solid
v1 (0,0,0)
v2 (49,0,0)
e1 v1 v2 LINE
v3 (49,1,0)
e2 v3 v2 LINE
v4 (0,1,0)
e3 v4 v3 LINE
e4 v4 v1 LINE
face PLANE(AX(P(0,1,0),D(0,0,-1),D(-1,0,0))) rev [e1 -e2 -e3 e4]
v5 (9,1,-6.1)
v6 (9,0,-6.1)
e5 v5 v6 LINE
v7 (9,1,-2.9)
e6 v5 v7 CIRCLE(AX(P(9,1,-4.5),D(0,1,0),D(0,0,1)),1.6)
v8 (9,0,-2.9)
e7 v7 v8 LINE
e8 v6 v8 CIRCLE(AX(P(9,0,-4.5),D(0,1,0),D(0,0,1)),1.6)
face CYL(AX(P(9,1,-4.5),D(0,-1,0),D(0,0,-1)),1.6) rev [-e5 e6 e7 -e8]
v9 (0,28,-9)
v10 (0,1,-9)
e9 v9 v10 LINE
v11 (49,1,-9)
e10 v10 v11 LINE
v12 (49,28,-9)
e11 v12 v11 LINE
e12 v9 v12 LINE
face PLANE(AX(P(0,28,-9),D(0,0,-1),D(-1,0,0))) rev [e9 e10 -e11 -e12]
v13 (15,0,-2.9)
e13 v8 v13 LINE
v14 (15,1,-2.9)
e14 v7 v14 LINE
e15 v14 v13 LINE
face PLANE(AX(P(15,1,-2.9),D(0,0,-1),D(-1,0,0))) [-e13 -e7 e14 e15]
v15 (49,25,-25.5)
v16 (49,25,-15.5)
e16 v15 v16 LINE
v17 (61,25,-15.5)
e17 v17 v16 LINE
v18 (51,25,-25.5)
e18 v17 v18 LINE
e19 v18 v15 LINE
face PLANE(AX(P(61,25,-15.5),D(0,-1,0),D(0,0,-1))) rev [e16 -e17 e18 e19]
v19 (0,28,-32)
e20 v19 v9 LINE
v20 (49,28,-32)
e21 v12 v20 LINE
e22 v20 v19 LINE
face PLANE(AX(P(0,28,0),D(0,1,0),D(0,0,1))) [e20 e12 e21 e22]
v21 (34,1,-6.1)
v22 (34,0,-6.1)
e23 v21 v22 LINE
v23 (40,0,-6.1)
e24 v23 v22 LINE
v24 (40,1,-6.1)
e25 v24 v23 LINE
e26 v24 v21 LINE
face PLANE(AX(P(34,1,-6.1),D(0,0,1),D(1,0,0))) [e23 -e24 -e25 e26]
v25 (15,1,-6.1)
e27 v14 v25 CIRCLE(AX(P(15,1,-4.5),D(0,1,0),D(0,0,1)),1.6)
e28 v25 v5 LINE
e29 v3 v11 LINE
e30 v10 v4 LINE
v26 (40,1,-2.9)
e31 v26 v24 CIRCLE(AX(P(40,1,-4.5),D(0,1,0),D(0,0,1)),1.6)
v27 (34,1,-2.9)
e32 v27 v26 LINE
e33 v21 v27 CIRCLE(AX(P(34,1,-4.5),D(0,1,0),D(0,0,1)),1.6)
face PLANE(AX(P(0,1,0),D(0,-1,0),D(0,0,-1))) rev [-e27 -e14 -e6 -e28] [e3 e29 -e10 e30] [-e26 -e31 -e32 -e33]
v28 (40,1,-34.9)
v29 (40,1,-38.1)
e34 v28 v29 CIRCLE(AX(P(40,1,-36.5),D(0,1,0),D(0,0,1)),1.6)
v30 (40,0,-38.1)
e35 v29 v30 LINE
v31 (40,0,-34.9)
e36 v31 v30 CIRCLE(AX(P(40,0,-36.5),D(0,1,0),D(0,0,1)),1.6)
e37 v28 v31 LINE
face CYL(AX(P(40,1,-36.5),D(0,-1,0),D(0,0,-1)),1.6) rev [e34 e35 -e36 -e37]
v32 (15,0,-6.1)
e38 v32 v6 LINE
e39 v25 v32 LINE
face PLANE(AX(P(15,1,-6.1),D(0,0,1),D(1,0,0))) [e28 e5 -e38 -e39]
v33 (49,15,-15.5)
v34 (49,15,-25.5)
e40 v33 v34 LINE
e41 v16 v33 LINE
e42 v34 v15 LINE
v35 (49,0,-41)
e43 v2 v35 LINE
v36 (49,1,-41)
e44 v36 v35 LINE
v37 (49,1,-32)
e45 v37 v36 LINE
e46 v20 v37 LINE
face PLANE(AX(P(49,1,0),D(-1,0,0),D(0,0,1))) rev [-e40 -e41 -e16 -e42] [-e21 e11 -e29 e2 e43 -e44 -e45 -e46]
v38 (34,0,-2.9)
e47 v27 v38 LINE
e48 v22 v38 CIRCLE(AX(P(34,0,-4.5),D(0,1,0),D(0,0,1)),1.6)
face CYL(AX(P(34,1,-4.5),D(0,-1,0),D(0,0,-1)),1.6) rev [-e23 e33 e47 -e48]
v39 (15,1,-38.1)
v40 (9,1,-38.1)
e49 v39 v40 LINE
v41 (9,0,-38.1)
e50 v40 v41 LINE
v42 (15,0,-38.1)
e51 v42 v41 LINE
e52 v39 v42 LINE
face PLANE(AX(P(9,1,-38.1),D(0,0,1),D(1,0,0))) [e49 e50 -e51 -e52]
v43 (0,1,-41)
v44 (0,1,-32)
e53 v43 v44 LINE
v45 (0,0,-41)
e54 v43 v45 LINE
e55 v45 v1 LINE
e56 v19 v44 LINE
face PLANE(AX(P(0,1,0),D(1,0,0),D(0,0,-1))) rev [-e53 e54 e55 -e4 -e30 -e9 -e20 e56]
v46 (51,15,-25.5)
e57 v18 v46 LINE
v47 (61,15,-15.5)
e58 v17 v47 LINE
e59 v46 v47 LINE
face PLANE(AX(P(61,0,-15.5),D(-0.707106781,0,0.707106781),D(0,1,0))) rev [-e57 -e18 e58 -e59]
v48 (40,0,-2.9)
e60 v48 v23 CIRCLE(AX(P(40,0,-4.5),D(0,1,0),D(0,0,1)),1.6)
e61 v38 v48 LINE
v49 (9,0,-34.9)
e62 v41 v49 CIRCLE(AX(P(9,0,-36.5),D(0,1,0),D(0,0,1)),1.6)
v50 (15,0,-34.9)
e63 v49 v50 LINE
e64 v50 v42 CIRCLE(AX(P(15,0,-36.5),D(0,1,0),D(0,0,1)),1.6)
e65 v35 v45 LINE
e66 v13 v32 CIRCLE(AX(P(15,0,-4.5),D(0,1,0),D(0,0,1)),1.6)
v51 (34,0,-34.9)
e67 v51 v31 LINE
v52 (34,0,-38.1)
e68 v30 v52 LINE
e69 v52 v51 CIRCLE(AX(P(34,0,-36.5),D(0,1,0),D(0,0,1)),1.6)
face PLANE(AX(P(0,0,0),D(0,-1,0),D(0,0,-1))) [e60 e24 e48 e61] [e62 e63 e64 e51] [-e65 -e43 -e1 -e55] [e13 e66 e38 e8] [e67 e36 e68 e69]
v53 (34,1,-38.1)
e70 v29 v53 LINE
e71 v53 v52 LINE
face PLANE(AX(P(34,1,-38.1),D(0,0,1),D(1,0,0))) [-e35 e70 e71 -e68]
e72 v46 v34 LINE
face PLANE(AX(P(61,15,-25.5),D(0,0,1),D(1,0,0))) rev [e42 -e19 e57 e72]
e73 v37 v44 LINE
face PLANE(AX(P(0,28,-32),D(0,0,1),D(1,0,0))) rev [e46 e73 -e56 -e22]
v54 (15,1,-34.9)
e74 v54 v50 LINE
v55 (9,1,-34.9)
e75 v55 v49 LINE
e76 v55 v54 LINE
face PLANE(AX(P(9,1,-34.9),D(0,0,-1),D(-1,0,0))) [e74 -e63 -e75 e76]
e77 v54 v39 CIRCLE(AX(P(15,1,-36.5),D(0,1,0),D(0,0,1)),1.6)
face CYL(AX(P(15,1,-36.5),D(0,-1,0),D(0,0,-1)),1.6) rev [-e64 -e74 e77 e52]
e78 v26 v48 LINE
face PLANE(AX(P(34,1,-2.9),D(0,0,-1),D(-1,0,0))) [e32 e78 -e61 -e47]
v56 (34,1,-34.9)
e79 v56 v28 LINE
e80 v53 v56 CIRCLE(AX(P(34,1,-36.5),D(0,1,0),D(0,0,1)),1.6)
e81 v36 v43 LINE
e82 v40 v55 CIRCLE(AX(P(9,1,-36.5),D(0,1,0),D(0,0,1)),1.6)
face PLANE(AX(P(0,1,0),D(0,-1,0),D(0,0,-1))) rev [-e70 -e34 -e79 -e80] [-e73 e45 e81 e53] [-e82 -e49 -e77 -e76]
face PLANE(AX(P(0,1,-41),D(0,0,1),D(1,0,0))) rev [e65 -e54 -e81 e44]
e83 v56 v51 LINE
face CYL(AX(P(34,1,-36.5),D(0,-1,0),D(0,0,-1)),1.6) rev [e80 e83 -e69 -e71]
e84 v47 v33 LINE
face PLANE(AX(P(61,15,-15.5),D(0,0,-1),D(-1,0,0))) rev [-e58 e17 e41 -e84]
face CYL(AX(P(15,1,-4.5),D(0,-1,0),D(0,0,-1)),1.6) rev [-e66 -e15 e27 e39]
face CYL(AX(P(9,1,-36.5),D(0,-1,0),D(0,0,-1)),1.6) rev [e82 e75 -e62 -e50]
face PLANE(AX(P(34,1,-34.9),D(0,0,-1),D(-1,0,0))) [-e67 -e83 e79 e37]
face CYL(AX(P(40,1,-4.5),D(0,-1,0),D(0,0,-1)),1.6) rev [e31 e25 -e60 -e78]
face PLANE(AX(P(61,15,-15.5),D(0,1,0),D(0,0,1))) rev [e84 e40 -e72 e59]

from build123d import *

# Parameters (mm, degrees)
SKETCH1_W           = 49
SKETCH1_H           = 41
BOSS_EXTRUDE1_DEPTH = 1
SKETCH2_W           = 49
SKETCH2_H           = 23
BOSS_EXTRUDE2_DEPTH = 27
SKETCH3_W           = 10
SKETCH3_H           = 10
BOSS_EXTRUDE3_DEPTH = 12
CHAMFER1_SIZE       = 10


with BuildPart() as part:
    # Sketch1 → Boss-Extrude1 (new body)
    with BuildSketch(Plane(origin=(0, 0, 0), x_dir=(1, 0, 0), z_dir=(0, 1, 0))):
        with Locations((24.5, 20.5)):
            Rectangle(SKETCH1_W, SKETCH1_H)
        with BuildLine():
            Line((9, 38.1), (15, 38.1))
            ThreePointArc((15, 38.1), (16.6, 36.5), (15, 34.9))
            Line((15, 34.9), (9, 34.9))
            ThreePointArc((9, 34.9), (7.4, 36.5), (9, 38.1))
        make_face(mode=Mode.SUBTRACT)
        with BuildLine():
            Line((34, 38.1), (40, 38.1))
            ThreePointArc((40, 38.1), (41.6, 36.5), (40, 34.9))
            Line((40, 34.9), (34, 34.9))
            ThreePointArc((34, 34.9), (32.4, 36.5), (34, 38.1))
        make_face(mode=Mode.SUBTRACT)
        with BuildLine():
            Line((34, 6.1), (40, 6.1))
            ThreePointArc((40, 6.1), (41.6, 4.5), (40, 2.9))
            Line((40, 2.9), (34, 2.9))
            ThreePointArc((34, 2.9), (32.4, 4.5), (34, 6.1))
        make_face(mode=Mode.SUBTRACT)
        with BuildLine():
            Line((15, 2.9), (9, 2.9))
            ThreePointArc((9, 2.9), (7.4, 4.5), (9, 6.1))
            Line((9, 6.1), (15, 6.1))
            ThreePointArc((15, 6.1), (16.6, 4.5), (15, 2.9))
        make_face(mode=Mode.SUBTRACT)
    extrude(amount=BOSS_EXTRUDE1_DEPTH)

    # Sketch2 → Boss-Extrude2 (add)
    with BuildSketch(Plane(origin=(0, 1, 0), x_dir=(1, 0, 0), z_dir=(0, 1, 0))):
        with Locations((24.5, 20.5)):
            Rectangle(SKETCH2_W, SKETCH2_H)
    extrude(amount=BOSS_EXTRUDE2_DEPTH)

    # Sketch3 → Boss-Extrude3 (add)
    with BuildSketch(Plane(origin=(49, 0, 0), x_dir=(0, 0, -1), z_dir=(1, 0, 0))):
        with Locations((20.5, 20)):
            Rectangle(SKETCH3_W, SKETCH3_H)
    extrude(amount=BOSS_EXTRUDE3_DEPTH)

    # Chamfer1
    chamfer1_edges = [part.edges().sort_by_distance(p)[0] for p in [
        (61, 20, -25.5),
    ]]
    chamfer(chamfer1_edges, length=CHAMFER1_SIZE - 0.0001)  # a hair under: the kernel refuses the full size


solid = part.part
